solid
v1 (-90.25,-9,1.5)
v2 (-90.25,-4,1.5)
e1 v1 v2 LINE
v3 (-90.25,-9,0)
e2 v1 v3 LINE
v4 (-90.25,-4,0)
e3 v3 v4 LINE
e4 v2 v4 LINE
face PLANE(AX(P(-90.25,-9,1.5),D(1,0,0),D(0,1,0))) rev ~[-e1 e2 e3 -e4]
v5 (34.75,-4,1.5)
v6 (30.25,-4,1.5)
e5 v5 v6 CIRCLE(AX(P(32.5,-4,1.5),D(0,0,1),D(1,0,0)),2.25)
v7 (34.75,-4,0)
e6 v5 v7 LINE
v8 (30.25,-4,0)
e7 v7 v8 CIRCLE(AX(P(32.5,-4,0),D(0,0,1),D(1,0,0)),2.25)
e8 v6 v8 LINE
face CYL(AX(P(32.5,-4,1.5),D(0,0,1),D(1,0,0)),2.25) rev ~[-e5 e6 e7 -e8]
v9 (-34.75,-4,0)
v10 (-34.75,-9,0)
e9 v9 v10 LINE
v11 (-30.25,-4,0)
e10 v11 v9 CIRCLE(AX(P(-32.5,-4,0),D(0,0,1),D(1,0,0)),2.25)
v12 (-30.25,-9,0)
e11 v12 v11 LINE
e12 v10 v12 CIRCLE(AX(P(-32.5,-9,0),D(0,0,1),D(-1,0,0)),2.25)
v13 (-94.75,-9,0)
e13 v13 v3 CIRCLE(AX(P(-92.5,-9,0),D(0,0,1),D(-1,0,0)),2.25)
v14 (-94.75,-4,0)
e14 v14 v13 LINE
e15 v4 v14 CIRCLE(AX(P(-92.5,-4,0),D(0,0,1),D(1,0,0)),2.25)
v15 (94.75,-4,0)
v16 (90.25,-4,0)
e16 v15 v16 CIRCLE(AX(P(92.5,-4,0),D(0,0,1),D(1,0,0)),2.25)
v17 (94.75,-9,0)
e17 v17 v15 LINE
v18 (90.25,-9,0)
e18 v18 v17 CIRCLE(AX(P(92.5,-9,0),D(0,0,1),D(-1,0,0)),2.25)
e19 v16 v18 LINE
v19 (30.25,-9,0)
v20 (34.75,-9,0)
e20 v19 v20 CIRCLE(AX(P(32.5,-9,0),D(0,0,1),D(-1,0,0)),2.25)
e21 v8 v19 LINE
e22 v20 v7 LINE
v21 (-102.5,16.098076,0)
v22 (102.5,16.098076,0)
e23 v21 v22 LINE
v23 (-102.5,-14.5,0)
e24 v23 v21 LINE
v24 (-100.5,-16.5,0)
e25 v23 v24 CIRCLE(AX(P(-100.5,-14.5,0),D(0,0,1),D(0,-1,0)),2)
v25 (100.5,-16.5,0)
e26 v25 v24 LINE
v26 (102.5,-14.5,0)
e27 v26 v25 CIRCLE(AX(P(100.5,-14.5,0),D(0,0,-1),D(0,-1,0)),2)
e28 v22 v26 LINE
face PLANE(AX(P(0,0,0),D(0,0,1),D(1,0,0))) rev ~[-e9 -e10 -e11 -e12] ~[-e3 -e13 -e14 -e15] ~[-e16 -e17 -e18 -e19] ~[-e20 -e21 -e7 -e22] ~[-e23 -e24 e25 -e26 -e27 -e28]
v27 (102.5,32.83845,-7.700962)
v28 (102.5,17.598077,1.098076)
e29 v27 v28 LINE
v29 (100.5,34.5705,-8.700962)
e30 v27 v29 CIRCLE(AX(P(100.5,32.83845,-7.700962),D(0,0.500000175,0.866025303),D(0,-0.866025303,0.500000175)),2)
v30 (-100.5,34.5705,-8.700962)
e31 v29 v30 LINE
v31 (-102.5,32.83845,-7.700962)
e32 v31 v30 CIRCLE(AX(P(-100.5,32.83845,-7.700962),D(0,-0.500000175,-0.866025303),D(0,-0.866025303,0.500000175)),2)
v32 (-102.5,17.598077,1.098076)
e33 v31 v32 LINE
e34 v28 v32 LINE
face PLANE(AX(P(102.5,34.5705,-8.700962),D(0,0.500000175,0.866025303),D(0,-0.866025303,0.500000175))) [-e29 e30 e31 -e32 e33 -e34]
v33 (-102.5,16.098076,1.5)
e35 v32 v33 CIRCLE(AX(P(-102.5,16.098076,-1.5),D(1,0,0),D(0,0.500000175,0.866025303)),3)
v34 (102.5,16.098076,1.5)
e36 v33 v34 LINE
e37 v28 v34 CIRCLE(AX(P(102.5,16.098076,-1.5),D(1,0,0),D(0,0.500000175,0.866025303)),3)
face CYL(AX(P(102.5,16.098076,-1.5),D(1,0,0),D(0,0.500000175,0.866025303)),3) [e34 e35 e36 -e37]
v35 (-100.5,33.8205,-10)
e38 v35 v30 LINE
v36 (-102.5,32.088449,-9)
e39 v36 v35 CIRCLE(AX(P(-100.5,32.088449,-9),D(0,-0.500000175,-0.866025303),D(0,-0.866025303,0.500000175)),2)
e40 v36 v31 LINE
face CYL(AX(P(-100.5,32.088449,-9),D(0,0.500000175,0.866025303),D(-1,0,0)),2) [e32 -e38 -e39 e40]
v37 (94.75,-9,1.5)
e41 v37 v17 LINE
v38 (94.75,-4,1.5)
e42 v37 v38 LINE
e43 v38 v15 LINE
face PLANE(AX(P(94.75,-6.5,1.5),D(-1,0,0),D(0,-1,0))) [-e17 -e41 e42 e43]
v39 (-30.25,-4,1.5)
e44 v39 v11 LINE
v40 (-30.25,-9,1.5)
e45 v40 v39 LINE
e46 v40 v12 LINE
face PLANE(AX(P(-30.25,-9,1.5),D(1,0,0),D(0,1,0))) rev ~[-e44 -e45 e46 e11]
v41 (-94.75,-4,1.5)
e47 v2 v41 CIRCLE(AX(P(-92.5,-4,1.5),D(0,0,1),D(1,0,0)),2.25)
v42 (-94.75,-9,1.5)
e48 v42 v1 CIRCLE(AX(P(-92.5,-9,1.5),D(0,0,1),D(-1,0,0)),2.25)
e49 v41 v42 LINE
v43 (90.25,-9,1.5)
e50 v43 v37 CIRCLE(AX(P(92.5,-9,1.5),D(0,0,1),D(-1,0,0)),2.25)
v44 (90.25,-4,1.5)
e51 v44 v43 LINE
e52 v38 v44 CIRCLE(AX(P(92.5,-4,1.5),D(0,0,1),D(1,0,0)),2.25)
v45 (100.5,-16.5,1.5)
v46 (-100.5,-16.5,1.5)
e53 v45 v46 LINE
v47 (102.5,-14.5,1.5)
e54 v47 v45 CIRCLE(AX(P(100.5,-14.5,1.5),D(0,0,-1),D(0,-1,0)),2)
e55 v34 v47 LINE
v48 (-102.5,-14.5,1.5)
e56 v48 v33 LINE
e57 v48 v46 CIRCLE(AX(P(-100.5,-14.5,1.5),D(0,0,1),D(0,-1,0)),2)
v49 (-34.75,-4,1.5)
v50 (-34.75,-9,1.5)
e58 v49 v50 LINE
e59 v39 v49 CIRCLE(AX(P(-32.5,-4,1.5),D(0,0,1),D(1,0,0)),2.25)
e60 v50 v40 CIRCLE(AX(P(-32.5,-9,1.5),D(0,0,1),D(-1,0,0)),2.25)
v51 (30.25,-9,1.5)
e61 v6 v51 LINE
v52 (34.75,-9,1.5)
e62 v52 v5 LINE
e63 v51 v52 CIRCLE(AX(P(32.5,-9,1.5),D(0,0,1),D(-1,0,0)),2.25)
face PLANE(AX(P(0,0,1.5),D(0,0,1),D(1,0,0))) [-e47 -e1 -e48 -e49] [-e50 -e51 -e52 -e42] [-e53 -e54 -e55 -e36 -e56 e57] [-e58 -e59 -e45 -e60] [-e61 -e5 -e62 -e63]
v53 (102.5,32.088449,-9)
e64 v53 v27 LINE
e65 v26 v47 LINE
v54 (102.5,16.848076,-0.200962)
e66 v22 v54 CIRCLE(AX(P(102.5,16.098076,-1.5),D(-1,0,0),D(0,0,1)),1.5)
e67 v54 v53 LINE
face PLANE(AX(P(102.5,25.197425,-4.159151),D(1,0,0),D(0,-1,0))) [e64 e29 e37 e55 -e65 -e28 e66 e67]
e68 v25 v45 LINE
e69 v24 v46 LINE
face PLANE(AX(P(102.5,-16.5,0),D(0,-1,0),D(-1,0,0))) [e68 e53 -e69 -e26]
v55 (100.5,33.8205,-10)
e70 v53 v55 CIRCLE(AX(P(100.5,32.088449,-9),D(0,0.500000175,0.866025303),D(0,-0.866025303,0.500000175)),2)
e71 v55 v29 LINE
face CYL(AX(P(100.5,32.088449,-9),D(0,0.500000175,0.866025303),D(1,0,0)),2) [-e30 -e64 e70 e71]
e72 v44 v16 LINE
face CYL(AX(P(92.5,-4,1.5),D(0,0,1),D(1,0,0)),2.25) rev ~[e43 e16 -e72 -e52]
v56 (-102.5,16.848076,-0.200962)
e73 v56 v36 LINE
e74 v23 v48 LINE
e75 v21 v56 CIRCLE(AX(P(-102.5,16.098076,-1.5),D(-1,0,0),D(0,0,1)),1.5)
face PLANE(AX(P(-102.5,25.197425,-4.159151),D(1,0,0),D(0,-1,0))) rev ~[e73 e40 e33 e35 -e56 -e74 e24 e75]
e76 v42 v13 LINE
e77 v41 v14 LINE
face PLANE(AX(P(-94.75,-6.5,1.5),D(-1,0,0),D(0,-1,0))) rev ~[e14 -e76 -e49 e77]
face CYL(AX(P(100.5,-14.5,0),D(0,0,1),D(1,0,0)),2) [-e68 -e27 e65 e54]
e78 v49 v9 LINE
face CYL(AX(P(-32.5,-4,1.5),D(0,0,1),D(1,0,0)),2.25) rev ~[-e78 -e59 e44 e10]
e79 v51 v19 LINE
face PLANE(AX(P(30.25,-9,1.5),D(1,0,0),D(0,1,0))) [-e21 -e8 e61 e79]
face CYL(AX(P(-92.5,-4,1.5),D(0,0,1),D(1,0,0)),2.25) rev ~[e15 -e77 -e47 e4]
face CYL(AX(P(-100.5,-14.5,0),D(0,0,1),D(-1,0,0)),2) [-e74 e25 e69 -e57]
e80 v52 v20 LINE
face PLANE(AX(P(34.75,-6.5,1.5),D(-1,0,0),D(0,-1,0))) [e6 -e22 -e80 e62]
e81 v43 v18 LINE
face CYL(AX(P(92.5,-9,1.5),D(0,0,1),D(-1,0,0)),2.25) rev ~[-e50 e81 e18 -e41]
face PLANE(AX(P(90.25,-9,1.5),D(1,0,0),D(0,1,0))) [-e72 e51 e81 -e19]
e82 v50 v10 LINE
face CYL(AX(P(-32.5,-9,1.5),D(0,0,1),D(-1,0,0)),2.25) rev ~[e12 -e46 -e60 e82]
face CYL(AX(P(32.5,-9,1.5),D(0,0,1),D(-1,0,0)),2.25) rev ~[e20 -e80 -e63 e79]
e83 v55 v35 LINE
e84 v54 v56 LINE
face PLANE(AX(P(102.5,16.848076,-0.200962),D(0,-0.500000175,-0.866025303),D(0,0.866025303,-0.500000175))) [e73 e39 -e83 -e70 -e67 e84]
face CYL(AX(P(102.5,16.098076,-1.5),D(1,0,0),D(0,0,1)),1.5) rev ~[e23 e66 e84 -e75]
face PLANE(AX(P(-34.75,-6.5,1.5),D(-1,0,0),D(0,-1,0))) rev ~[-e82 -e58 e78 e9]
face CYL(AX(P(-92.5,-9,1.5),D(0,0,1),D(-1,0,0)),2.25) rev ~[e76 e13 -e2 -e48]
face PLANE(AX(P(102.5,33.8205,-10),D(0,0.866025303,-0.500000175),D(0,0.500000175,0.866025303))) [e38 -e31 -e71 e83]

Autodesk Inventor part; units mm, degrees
ref_plane "YZ Plane" through (0, 0, 0) normal (1, 0, 0) x (0, 1, 0)
ref_plane "XZ Plane" through (0, 0, 0) normal (0, 1, 0) x (-1, 0, 0)
ref_plane "XY Plane" through (0, 0, 0) normal (0, 0, 1) x (1, 0, 0)
sketch "スケッチ1" plane through (0, 0, 0) normal (0, 0, 1) x (1, 0, 0)
  line L0 (102.5, -16.5) -> (-102.5, -16.5)
  line L1 (-102.5, -16.5) -> (-102.5, 16.5)
  line L2 (-102.5, 16.5) -> (102.5, 16.5)
  line L3 (102.5, 16.5) -> (102.5, -16.5)
  line L4 (102.5, -16.5) -> (-102.5, 16.5) construction
  line L5 (-102.5, -16.5) -> (102.5, 16.5) construction
  point P0 (0, 0)
  dimension "d0" = 205
  dimension "d1" = 33
extrude "プレート1" add sketch "スケッチ1" along normal blind 1.5
sketch "スケッチ2" plane through (102.5, 16.5, 0) normal (0, 0.5, 0.8660254) x (-1, 0, 0)
  line L0 (205, 0) -> (0, 0)
  line L1 (0, 0) -> (0, -20)
  line L2 (0, -20) -> (205, -20)
  line L3 (205, -20) -> (205, 0)
edge flange "フランジ1" height 20 angle 30 thickness 1.5 bend radius 1.5 thickness toward (0, 0.5, 0.8660254) relief tear relief width 1.5 relief depth 0.75 edges at (0, 16.5, 0) wall of the first edge with corners at (-102.5, 16.5, 0) (102.5, 16.5, 0) (102.5, 33.8205, -10) (-102.5, 33.8205, -10)
bend "曲げ1"
corner "コーナー1"
sketch "スケッチ3" plane through (0, 0, 1.5) normal (0, 0, 1) x (1, 0, 0)
  line L0 (102.5, 16.0981) -> (-102.5, 16.0981) projected
  line L1 (-102.5, -16.5) -> (-102.5, 16.0981) projected
  line L2 (102.5, -16.5) -> (-102.5, -16.5) projected
  line L3 (102.5, 16.0981) -> (102.5, -16.5) projected
  point P0 (0, 0)
  point P1 (-92.5, -6.5)
  point P2 (92.5, -6.5)
  point P3 (-32.5, -6.5)
  point P4 (32.5, -6.5)
  dimension "d13" = 10
  dimension "d14" = 10
  dimension "d15" = 10
  dimension "d16" = 185
  dimension "d32" = 60
  dimension "d33" = 60
hole "穴1" at (-92.5, -6.5, 1.5) at (92.5, -6.5, 1.5) at (-32.5, -6.5, 1.5) at (32.5, -6.5, 1.5) direction (0, 0, -1) diameter 4.5 end through all
fillet "フィレット1" radius 2 4 edges at (-102.5, -16.5, 0.75) (-102.5, 34.1955, -9.3505) (102.5, 34.1955, -9.3505) (102.5, -16.5, 0.75)
sketch "スケッチ4" plane through (0, 0, 1.5) normal (0, 0, 1) x (1, 0, 0)
  circle A0 centre (-32.5, -6.5) radius 2.25 projected
  circle A1 centre (-92.5, -6.5) radius 2.25 projected
  circle A2 centre (92.5, -6.5) radius 2.25 projected
  circle A3 centre (32.5, -6.5) radius 2.25 projected
  arc A4 (100.5, -16.5) -> (102.5, -14.5) centre (100.5, -14.5) ccw projected
  line L0 (102.5, 16.0981) -> (102.5, -14.5) projected
  line L1 (102.5, 16.0981) -> (-102.5, 16.0981) projected
  line L2 (-102.5, -14.5) -> (-102.5, 16.0981) projected
  arc A5 (-102.5, -14.5) -> (-100.5, -16.5) centre (-100.5, -14.5) ccw projected
  line L3 (100.5, -16.5) -> (-100.5, -16.5) projected
  line L4 (-92.5, -4) -> (-92.5, -9) construction
  line L5 (-94.75, -4) -> (-94.75, -9)
  line L6 (-90.25, -9) -> (-90.25, -4)
  arc A6 (-90.25, -4) -> (-94.75, -4) centre (-92.5, -4) ccw
  arc A7 (-94.75, -9) -> (-90.25, -9) centre (-92.5, -9) ccw
  line L7 (-32.5, -9) -> (-32.5, -4) construction
  line L8 (-30.25, -9) -> (-30.25, -4)
  line L9 (-34.75, -4) -> (-34.75, -9)
  arc A8 (-34.75, -9) -> (-30.25, -9) centre (-32.5, -9) ccw
  arc A9 (-30.25, -4) -> (-34.75, -4) centre (-32.5, -4) ccw
  line L10 (32.5, -9) -> (32.5, -4) construction
  circle A10 centre (32.5, -6.5) radius 2.25 projected
  line L11 (30.25, -9) -> (30.25, -4)
  line L12 (34.75, -4) -> (34.75, -9)
  arc A11 (30.25, -9) -> (34.75, -9) centre (32.5, -9) ccw
  arc A12 (34.75, -4) -> (30.25, -4) centre (32.5, -4) ccw
  line L13 (92.5, -9) -> (92.5, -4) construction
  line L14 (90.25, -9) -> (90.25, -4)
  line L15 (94.75, -4) -> (94.75, -9)
  arc A13 (90.25, -9) -> (94.75, -9) centre (92.5, -9) ccw
  arc A14 (94.75, -4) -> (90.25, -4) centre (92.5, -4) ccw
  circle A15 centre (-32.5, -6.5) radius 2.25 projected
  circle A16 centre (-92.5, -6.5) radius 2.25 projected
  point P0 (0, 0)
  dimension "d34" = 5
extrude "押し出し1" cut sketch "スケッチ4" against normal blind 10 contours A0 | L8 A8 L9 A0 | A0 L9 A9 L8 | A1 | L6 A7 L5 A1 | A1 L5 A6 L6 | A2 | L15 A13 L14 A2 | A2 L14 A14 L15 | A3 | L12 A11 L11 A3 | A3 L11 A12 L12
equation "\"d29\" = Thickness"
equation "\"d2\" = Thickness"
equation "\"d3\" = BendReliefWidth"
equation "\"d4\" = BendReliefDepth"
equation "\"d5\" = MinimumRemnant"
equation "\"d6\" = TransitionRadius"
equation "\"d9\" = BendRadius"
equation "\"d10\" = CornerReliefSize"
equation "\"d11\" = GapSize"
equation "\"d12\" = JacobiRadiusSize"
equation "\"BendRadius\" = Thickness"
equation "\"BendReliefWidth\" = Thickness"
equation "\"BendReliefDepth\" = 0.5 * Thickness"
equation "\"CornerReliefSize\" = 4 * Thickness"
equation "\"MinimumRemnant\" = 2 * Thickness"
equation "\"TransitionRadius\" = BendRadius"
equation "\"JacobiRadiusSize\" = BendRadius"
equation "\"GapSize\" = Thickness"
equation "\"Thickness\" = 1.5"
properties part number "Scraper_Bar"
